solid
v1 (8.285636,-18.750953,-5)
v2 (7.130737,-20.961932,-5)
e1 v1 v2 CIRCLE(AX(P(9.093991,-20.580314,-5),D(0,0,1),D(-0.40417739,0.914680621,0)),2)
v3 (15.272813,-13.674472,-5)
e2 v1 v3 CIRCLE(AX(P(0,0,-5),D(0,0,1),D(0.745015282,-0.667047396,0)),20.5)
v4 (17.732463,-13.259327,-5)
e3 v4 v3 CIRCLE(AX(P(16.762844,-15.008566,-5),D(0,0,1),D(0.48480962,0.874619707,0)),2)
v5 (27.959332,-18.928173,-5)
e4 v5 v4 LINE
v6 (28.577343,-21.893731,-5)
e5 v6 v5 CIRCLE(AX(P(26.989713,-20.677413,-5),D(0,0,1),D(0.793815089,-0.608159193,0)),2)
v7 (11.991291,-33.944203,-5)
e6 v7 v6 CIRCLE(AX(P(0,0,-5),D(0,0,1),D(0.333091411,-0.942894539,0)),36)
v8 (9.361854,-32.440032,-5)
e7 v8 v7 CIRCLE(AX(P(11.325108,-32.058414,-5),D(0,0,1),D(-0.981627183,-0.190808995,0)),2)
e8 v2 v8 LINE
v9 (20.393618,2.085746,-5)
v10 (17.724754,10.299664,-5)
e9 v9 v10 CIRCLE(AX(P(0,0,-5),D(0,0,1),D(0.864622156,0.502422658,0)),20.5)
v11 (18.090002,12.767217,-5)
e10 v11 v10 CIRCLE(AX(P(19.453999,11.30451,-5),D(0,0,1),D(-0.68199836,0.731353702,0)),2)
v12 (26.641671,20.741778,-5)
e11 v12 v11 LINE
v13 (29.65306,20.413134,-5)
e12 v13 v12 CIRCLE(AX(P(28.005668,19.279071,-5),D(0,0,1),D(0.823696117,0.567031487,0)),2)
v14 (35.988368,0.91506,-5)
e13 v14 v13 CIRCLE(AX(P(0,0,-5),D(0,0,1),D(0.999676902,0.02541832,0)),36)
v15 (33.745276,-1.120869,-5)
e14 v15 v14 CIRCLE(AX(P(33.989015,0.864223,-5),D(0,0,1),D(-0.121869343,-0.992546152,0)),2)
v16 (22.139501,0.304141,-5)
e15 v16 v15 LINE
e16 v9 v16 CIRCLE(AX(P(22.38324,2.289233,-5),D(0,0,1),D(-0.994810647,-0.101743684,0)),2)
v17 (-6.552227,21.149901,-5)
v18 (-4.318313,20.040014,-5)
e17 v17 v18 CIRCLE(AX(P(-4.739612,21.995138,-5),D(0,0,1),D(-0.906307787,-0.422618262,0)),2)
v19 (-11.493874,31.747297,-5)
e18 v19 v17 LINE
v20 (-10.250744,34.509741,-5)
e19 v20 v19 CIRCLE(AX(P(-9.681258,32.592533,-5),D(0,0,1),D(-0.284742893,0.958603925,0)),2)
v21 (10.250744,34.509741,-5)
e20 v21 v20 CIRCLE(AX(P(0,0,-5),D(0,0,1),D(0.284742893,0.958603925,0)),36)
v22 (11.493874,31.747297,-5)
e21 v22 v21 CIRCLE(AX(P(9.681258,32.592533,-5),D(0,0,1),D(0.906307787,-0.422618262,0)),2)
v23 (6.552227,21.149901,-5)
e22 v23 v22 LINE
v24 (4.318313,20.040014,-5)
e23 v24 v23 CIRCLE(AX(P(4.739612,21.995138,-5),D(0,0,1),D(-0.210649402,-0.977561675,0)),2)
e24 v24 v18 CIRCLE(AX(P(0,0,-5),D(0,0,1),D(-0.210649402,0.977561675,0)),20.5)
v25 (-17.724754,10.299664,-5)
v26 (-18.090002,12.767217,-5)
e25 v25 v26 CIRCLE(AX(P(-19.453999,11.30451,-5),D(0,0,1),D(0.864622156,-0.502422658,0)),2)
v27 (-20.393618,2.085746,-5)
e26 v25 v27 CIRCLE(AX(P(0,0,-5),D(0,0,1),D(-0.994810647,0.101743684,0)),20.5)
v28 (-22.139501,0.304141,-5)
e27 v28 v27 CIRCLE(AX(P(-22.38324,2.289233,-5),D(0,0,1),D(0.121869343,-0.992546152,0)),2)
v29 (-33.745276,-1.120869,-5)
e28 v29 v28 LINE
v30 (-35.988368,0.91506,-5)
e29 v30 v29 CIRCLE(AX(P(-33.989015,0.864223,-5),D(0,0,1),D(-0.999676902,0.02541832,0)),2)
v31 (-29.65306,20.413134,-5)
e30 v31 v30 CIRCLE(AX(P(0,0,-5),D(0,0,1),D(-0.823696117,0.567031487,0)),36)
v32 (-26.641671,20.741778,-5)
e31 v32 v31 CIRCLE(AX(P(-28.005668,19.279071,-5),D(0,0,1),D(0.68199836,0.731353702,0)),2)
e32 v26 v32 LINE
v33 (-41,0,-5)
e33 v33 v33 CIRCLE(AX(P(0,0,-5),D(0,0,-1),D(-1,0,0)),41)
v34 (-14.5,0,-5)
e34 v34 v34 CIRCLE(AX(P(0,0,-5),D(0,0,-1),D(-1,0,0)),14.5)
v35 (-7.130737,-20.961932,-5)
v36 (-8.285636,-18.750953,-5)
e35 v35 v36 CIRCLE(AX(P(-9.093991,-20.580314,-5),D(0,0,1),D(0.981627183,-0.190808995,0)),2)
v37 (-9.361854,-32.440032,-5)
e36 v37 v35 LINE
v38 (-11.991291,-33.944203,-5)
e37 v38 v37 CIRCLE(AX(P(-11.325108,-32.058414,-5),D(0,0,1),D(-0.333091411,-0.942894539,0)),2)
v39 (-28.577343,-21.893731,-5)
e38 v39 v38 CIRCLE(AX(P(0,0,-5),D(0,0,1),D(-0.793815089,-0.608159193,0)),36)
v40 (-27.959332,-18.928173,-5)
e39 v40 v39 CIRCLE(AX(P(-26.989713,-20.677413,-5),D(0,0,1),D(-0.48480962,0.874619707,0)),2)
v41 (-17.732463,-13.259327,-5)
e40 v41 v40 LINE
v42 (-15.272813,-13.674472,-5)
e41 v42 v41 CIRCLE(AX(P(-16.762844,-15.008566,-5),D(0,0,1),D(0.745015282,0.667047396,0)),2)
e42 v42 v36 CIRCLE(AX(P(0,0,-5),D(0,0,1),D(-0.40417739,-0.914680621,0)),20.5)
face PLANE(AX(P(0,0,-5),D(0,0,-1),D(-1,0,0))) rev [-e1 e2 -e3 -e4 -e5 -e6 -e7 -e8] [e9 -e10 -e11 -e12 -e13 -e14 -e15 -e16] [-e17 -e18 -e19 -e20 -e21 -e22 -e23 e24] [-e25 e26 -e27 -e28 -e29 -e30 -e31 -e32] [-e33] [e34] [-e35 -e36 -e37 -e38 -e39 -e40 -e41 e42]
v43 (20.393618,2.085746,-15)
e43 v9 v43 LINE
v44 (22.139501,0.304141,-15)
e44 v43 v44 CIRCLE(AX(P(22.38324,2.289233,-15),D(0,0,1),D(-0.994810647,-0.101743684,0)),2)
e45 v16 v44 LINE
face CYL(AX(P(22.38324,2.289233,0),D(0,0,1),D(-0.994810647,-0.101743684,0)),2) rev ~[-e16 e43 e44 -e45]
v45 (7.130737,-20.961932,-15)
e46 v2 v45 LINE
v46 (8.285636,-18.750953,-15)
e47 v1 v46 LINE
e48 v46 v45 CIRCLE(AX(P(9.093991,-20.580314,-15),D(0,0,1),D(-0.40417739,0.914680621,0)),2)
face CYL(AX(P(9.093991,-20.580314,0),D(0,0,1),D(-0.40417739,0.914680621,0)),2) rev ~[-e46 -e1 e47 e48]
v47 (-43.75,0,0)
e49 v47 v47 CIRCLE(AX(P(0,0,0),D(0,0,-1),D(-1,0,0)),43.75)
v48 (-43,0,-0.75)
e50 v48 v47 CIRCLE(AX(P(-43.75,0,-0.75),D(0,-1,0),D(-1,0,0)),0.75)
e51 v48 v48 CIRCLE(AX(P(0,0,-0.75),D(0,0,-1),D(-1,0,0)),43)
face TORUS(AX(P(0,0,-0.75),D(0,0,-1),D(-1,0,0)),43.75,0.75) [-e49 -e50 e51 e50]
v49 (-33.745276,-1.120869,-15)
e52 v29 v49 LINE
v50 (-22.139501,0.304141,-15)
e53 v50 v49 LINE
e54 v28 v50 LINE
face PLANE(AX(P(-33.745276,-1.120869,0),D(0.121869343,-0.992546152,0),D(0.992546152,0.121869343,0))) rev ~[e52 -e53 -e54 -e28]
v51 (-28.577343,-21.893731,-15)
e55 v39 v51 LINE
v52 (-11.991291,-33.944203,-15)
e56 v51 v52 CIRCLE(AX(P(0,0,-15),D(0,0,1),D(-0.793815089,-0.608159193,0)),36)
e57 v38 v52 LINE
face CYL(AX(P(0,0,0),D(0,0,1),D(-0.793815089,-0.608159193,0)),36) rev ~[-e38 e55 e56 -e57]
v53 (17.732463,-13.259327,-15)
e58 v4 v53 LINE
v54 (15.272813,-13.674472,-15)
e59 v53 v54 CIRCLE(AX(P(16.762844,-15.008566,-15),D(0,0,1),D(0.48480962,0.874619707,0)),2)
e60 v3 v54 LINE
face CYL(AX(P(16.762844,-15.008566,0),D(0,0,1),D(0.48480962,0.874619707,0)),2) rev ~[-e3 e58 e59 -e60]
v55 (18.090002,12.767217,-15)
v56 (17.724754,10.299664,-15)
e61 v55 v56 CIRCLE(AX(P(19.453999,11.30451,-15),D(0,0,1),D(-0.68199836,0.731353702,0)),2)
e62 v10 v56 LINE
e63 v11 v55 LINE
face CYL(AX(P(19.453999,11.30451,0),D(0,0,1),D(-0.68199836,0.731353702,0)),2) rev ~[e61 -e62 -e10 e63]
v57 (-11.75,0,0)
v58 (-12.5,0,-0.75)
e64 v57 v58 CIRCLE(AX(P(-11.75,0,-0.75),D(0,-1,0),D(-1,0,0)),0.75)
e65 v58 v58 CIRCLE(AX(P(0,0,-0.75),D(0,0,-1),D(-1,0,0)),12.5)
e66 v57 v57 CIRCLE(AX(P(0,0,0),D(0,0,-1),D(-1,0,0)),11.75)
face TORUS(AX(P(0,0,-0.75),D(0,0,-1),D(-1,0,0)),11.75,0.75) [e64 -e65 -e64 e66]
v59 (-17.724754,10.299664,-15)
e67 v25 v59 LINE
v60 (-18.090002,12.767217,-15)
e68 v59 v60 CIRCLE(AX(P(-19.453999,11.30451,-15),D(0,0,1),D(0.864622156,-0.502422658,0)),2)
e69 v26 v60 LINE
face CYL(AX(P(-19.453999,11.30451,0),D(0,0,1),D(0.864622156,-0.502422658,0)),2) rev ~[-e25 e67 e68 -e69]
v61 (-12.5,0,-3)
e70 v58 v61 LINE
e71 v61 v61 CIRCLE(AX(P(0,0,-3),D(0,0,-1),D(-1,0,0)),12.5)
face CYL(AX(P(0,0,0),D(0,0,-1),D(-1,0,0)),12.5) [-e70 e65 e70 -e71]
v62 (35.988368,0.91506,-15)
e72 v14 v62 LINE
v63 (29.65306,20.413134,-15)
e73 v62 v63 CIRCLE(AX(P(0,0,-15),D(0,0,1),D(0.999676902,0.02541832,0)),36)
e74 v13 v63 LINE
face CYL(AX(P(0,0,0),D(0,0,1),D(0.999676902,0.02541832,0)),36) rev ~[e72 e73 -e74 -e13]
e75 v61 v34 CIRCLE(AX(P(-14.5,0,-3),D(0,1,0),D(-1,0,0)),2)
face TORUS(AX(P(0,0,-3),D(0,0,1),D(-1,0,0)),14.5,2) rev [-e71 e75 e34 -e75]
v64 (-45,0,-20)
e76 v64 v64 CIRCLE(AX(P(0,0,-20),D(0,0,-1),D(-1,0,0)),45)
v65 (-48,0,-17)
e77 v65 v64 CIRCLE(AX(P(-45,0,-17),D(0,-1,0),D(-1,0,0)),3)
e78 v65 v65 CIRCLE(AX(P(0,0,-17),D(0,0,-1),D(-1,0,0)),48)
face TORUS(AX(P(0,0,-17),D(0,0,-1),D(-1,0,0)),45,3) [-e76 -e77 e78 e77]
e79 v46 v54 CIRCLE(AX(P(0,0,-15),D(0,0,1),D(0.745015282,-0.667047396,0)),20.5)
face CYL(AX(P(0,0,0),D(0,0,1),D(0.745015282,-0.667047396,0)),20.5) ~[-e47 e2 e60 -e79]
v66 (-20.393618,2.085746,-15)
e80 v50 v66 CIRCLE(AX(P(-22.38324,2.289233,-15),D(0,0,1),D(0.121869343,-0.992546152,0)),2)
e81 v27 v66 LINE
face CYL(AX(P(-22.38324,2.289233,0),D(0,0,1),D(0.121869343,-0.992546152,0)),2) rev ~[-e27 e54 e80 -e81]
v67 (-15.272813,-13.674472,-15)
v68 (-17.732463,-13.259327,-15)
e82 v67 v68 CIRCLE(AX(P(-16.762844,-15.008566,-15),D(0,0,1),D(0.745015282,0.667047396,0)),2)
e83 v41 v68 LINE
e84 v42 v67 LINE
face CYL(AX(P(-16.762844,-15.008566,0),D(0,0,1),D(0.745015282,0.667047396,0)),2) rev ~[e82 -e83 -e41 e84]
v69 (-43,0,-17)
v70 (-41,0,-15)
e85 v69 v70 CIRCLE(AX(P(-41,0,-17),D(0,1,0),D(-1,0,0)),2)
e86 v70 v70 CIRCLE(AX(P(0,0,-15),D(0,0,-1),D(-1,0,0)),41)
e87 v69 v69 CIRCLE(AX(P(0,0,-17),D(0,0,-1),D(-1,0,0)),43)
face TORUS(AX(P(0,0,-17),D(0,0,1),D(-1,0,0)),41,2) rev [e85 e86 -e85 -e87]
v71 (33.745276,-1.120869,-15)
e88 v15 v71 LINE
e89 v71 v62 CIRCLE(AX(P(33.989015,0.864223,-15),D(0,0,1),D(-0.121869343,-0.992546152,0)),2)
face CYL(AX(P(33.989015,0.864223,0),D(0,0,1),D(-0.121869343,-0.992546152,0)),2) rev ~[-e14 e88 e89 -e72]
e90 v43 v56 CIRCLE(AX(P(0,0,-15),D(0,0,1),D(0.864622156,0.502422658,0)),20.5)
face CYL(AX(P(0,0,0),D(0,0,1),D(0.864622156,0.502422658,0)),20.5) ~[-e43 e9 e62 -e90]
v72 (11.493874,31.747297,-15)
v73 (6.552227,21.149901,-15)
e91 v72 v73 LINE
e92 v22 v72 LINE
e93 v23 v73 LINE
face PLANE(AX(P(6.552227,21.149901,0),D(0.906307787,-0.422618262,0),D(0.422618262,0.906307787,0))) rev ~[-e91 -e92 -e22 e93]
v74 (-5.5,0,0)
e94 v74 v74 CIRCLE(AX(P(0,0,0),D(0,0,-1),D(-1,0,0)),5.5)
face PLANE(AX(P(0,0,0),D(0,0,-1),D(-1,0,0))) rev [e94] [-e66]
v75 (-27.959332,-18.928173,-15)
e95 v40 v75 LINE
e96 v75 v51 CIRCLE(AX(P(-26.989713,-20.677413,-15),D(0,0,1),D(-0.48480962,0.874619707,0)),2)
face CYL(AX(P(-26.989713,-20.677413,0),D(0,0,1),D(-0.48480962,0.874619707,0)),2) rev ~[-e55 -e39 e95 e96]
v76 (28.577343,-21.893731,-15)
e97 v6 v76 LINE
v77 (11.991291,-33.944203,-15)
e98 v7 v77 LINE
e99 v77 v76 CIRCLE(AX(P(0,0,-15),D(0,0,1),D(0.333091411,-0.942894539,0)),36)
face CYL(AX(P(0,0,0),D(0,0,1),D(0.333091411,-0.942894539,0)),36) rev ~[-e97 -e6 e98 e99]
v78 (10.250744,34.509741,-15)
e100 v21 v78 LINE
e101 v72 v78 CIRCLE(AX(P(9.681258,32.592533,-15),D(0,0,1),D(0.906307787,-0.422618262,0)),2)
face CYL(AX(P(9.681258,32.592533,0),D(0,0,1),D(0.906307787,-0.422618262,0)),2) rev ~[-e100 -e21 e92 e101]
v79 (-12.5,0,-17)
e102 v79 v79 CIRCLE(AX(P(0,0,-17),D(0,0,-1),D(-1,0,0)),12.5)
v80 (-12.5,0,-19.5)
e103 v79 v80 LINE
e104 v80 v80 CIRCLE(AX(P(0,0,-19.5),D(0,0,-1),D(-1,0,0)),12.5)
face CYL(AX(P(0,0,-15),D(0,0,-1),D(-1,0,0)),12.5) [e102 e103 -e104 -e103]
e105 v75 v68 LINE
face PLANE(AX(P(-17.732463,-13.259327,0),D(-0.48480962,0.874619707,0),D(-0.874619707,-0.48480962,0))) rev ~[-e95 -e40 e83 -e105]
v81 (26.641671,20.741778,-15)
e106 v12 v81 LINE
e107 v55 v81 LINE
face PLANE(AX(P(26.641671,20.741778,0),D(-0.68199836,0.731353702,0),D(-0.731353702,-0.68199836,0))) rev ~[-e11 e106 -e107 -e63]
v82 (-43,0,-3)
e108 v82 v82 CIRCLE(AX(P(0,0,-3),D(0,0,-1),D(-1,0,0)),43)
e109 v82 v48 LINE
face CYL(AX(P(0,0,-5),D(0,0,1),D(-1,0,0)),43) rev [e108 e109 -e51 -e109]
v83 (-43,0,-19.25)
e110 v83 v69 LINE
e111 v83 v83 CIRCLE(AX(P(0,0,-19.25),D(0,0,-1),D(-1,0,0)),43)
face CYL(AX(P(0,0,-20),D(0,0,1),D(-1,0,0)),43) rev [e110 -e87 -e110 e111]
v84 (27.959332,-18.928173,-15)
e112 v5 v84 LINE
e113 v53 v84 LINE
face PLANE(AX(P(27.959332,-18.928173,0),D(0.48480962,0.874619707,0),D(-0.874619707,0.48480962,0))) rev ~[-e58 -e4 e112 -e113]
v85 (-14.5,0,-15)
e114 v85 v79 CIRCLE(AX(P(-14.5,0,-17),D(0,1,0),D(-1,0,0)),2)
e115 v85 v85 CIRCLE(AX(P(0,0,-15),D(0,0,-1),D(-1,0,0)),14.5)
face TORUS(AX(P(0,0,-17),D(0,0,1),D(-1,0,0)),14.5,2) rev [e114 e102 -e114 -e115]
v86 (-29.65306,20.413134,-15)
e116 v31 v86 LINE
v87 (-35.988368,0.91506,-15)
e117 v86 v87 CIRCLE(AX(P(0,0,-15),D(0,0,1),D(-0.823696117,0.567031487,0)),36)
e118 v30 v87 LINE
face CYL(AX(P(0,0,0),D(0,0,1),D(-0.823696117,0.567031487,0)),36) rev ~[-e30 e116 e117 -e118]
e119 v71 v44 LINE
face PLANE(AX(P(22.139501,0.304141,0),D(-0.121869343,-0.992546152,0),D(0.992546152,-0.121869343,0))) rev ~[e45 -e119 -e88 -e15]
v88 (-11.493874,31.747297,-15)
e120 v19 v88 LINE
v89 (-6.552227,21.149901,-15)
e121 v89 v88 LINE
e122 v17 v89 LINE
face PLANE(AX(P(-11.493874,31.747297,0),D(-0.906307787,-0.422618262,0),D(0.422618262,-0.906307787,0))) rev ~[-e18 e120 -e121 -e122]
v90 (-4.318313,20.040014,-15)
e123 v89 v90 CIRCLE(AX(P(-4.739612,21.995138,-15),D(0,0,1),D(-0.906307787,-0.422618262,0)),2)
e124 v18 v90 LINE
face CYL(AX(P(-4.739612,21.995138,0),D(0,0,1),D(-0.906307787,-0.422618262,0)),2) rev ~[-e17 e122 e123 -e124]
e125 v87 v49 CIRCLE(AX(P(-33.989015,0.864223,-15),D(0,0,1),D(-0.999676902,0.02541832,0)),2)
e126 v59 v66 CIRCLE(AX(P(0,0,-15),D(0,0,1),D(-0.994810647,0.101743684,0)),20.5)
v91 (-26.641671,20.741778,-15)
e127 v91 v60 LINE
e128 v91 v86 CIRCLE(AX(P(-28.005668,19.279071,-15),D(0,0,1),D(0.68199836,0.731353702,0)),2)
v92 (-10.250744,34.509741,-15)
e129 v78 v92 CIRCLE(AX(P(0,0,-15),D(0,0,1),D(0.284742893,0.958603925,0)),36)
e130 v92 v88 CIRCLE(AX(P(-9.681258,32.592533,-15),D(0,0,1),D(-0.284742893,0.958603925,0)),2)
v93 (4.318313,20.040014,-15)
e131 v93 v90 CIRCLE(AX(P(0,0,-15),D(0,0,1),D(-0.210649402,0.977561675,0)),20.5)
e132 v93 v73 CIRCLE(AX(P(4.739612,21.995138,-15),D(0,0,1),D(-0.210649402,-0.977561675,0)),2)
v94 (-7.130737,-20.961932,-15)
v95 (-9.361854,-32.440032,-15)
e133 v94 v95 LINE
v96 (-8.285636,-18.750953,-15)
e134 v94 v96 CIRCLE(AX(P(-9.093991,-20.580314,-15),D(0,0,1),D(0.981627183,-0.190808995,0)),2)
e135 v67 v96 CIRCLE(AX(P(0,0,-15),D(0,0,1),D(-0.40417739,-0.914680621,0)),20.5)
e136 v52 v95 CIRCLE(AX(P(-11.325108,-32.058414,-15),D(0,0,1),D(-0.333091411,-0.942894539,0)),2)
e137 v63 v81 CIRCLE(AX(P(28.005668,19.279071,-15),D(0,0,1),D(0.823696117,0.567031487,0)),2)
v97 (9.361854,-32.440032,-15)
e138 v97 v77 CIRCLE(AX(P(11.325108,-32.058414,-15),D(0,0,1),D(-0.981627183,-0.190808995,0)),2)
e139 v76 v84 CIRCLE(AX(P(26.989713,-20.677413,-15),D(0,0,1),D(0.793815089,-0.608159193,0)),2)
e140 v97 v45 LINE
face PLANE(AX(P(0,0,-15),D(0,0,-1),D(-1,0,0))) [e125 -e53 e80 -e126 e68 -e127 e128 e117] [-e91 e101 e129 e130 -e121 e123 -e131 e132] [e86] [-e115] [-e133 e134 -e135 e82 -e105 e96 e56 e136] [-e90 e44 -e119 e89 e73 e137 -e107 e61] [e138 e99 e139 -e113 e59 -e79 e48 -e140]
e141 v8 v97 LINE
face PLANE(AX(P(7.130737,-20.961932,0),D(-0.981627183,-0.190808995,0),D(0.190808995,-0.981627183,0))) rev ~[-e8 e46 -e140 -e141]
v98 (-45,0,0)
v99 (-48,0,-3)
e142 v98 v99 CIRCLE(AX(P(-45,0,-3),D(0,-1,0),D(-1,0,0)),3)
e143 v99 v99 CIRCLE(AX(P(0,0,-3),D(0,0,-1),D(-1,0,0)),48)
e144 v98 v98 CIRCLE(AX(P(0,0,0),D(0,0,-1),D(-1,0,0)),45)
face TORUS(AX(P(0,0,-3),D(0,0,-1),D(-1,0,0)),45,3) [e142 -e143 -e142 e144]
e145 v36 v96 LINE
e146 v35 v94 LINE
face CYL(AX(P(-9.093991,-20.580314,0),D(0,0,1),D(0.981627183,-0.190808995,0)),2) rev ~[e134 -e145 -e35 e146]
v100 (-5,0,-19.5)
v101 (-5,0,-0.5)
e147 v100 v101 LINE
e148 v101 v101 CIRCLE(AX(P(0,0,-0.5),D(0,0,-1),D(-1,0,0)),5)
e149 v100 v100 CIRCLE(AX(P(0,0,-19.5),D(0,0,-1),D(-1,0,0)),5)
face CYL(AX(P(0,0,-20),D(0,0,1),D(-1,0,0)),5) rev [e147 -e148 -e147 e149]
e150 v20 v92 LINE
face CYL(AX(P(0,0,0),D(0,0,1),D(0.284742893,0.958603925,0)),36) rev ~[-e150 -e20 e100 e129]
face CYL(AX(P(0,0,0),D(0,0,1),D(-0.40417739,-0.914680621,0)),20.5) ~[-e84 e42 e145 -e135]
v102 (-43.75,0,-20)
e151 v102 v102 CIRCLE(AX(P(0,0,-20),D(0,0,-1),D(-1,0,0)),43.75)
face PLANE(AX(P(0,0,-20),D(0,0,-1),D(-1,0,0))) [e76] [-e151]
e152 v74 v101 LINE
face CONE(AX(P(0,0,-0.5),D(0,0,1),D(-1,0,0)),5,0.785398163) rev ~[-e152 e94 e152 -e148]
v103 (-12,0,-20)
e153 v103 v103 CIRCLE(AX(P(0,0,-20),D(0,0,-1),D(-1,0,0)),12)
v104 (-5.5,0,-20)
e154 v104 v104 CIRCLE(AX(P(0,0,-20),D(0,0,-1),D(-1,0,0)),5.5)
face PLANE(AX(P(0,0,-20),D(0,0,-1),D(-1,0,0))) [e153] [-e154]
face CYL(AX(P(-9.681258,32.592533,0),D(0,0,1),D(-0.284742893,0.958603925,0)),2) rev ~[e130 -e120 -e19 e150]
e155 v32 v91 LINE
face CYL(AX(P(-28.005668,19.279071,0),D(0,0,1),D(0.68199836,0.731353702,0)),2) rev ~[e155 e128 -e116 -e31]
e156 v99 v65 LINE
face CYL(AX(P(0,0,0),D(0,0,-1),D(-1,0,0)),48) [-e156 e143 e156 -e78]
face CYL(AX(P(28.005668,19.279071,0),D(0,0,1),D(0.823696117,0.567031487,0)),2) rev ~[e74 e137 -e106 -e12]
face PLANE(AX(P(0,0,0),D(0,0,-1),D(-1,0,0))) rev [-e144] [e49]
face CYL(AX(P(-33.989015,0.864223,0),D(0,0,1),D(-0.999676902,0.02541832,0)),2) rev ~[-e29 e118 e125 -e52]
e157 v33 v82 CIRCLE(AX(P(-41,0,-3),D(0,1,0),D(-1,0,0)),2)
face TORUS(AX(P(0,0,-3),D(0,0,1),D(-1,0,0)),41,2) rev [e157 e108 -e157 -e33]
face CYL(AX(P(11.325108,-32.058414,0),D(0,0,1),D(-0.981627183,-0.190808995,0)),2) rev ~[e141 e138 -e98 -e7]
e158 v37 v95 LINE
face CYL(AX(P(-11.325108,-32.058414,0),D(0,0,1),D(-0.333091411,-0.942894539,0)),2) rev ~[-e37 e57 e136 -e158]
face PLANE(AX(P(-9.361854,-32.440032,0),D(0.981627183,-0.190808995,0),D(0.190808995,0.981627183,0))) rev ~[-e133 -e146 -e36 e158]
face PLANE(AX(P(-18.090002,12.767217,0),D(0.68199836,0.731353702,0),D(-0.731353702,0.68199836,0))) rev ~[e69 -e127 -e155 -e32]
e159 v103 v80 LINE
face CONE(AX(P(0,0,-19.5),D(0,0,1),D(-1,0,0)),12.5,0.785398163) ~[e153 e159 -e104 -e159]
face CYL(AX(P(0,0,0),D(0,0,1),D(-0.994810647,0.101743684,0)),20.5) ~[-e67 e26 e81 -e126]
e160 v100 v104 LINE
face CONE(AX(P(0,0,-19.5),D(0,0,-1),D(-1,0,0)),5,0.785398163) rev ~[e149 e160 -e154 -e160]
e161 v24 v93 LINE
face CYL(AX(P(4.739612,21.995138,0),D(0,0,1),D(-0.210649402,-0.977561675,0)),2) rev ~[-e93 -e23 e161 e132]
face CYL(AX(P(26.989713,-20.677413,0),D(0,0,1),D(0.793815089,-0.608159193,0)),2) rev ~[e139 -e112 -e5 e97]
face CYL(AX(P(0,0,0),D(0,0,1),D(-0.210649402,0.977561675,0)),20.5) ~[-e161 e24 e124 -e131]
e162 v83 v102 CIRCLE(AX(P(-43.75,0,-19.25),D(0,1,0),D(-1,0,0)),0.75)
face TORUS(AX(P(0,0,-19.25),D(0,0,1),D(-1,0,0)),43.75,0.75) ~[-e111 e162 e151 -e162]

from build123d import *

# Parameters (mm, degrees)
F2_R            = 2
F3_R            = 3
F4_SIZE         = 0.5
F5_R            = 0.75
F8_DEPTH        = 20.001
F8_COPIES_COUNT = 5


# Not quite as in the source:
# - a pattern or mirror of a feature is missing from the dataset's text; its kind, count and spacing are read off the source's solid
# - a feature names something its author has since deleted; it is built from what else it names


with BuildPart() as f1:
    # F0 (on Front) → F1 (revolve)
    with BuildSketch(Plane.XZ):
        Polygon((-5, -20), (-5, 0), (-12.5, 0), (-12.5, -5), (-43, -5), (-43, 0), (-48, 0), (-48, -20), (-43, -20), (-43, -15), (-12.5, -15), (-12.5, -20), align=None)
    revolve(axis=Axis((0, 0, -8.972), (0, 0, -1)))

    # F2
    f2_edges = [f1.edges().sort_by_distance(p)[0] for p in [
        (12.5, 0, -5),
        (43, 0, -5),
        (12.5, 0, -15),
        (43, 0, -15),
    ]]
    fillet(f2_edges, radius=F2_R)

    # F3
    f3_edges = [f1.edges().sort_by_distance(p)[0] for p in [
        (48, 0, 0),
        (48, 0, -20),
    ]]
    fillet(f3_edges, radius=F3_R)

    # F4
    f4_edges = [f1.edges().sort_by_distance(p)[0] for p in [
        (12.5, 0, -20),
        (5, 0, -20),
        (5, 0, 0),
        (-5, 0, -10),
    ]]
    chamfer(f4_edges, length=F4_SIZE)

    # F5
    f5_edges = [f1.edges().sort_by_distance(p)[0] for p in [
        (-43, 0, -18.5),
        (43, 0, -17),
        (43, 0, -20),
        (-43, 0, -1.5),
        (43, 0, -3),
        (43, 0, 0),
        (12.5, 0, 0),
    ]]
    fillet(f5_edges, radius=F5_R)

    # F6 (on Top) → F8 (cut, through all)
    with BuildSketch(Plane.XY):
        with BuildLine():
            ThreePointArc((11.4938739259, 31.7472969271), (11.5050939944, 33.413279178), (10.2507441373, 34.5097413006))
            ThreePointArc((10.2507441373, 34.5097413006), (0, 36), (-10.2507441373, 34.5097413006))
            ThreePointArc((-10.2507441373, 34.5097413006), (-11.5050939944, 33.413279178), (-11.4938739259, 31.7472969271))
            Line((-11.4938739259, 31.7472969271), (-6.5522271295, 21.1499011734))
            ThreePointArc((-6.5522271295, 21.1499011734), (-5.629500751, 20.2040215031), (-4.3183127505, 20.040014346))
            ThreePointArc((-4.3183127505, 20.040014346), (0, 20.5), (4.3183127505, 20.040014346))
            ThreePointArc((4.3183127505, 20.040014346), (5.629500751, 20.2040215031), (6.5522271295, 21.1499011734))
            Line((6.5522271295, 21.1499011734), (11.4938739259, 31.7472969271))
        make_face()
    f8 = extrude(amount=-F8_DEPTH, mode=Mode.SUBTRACT)

    # F8_copies: F8 ×5 about axis
    f8_copies_axis = Axis((0, 0, 0), (0, 0, 1))
    for i in range(1, F8_COPIES_COUNT):
        add(f8.rotate(f8_copies_axis, i * 360 / F8_COPIES_COUNT), mode=Mode.SUBTRACT)


solid = f1.part
